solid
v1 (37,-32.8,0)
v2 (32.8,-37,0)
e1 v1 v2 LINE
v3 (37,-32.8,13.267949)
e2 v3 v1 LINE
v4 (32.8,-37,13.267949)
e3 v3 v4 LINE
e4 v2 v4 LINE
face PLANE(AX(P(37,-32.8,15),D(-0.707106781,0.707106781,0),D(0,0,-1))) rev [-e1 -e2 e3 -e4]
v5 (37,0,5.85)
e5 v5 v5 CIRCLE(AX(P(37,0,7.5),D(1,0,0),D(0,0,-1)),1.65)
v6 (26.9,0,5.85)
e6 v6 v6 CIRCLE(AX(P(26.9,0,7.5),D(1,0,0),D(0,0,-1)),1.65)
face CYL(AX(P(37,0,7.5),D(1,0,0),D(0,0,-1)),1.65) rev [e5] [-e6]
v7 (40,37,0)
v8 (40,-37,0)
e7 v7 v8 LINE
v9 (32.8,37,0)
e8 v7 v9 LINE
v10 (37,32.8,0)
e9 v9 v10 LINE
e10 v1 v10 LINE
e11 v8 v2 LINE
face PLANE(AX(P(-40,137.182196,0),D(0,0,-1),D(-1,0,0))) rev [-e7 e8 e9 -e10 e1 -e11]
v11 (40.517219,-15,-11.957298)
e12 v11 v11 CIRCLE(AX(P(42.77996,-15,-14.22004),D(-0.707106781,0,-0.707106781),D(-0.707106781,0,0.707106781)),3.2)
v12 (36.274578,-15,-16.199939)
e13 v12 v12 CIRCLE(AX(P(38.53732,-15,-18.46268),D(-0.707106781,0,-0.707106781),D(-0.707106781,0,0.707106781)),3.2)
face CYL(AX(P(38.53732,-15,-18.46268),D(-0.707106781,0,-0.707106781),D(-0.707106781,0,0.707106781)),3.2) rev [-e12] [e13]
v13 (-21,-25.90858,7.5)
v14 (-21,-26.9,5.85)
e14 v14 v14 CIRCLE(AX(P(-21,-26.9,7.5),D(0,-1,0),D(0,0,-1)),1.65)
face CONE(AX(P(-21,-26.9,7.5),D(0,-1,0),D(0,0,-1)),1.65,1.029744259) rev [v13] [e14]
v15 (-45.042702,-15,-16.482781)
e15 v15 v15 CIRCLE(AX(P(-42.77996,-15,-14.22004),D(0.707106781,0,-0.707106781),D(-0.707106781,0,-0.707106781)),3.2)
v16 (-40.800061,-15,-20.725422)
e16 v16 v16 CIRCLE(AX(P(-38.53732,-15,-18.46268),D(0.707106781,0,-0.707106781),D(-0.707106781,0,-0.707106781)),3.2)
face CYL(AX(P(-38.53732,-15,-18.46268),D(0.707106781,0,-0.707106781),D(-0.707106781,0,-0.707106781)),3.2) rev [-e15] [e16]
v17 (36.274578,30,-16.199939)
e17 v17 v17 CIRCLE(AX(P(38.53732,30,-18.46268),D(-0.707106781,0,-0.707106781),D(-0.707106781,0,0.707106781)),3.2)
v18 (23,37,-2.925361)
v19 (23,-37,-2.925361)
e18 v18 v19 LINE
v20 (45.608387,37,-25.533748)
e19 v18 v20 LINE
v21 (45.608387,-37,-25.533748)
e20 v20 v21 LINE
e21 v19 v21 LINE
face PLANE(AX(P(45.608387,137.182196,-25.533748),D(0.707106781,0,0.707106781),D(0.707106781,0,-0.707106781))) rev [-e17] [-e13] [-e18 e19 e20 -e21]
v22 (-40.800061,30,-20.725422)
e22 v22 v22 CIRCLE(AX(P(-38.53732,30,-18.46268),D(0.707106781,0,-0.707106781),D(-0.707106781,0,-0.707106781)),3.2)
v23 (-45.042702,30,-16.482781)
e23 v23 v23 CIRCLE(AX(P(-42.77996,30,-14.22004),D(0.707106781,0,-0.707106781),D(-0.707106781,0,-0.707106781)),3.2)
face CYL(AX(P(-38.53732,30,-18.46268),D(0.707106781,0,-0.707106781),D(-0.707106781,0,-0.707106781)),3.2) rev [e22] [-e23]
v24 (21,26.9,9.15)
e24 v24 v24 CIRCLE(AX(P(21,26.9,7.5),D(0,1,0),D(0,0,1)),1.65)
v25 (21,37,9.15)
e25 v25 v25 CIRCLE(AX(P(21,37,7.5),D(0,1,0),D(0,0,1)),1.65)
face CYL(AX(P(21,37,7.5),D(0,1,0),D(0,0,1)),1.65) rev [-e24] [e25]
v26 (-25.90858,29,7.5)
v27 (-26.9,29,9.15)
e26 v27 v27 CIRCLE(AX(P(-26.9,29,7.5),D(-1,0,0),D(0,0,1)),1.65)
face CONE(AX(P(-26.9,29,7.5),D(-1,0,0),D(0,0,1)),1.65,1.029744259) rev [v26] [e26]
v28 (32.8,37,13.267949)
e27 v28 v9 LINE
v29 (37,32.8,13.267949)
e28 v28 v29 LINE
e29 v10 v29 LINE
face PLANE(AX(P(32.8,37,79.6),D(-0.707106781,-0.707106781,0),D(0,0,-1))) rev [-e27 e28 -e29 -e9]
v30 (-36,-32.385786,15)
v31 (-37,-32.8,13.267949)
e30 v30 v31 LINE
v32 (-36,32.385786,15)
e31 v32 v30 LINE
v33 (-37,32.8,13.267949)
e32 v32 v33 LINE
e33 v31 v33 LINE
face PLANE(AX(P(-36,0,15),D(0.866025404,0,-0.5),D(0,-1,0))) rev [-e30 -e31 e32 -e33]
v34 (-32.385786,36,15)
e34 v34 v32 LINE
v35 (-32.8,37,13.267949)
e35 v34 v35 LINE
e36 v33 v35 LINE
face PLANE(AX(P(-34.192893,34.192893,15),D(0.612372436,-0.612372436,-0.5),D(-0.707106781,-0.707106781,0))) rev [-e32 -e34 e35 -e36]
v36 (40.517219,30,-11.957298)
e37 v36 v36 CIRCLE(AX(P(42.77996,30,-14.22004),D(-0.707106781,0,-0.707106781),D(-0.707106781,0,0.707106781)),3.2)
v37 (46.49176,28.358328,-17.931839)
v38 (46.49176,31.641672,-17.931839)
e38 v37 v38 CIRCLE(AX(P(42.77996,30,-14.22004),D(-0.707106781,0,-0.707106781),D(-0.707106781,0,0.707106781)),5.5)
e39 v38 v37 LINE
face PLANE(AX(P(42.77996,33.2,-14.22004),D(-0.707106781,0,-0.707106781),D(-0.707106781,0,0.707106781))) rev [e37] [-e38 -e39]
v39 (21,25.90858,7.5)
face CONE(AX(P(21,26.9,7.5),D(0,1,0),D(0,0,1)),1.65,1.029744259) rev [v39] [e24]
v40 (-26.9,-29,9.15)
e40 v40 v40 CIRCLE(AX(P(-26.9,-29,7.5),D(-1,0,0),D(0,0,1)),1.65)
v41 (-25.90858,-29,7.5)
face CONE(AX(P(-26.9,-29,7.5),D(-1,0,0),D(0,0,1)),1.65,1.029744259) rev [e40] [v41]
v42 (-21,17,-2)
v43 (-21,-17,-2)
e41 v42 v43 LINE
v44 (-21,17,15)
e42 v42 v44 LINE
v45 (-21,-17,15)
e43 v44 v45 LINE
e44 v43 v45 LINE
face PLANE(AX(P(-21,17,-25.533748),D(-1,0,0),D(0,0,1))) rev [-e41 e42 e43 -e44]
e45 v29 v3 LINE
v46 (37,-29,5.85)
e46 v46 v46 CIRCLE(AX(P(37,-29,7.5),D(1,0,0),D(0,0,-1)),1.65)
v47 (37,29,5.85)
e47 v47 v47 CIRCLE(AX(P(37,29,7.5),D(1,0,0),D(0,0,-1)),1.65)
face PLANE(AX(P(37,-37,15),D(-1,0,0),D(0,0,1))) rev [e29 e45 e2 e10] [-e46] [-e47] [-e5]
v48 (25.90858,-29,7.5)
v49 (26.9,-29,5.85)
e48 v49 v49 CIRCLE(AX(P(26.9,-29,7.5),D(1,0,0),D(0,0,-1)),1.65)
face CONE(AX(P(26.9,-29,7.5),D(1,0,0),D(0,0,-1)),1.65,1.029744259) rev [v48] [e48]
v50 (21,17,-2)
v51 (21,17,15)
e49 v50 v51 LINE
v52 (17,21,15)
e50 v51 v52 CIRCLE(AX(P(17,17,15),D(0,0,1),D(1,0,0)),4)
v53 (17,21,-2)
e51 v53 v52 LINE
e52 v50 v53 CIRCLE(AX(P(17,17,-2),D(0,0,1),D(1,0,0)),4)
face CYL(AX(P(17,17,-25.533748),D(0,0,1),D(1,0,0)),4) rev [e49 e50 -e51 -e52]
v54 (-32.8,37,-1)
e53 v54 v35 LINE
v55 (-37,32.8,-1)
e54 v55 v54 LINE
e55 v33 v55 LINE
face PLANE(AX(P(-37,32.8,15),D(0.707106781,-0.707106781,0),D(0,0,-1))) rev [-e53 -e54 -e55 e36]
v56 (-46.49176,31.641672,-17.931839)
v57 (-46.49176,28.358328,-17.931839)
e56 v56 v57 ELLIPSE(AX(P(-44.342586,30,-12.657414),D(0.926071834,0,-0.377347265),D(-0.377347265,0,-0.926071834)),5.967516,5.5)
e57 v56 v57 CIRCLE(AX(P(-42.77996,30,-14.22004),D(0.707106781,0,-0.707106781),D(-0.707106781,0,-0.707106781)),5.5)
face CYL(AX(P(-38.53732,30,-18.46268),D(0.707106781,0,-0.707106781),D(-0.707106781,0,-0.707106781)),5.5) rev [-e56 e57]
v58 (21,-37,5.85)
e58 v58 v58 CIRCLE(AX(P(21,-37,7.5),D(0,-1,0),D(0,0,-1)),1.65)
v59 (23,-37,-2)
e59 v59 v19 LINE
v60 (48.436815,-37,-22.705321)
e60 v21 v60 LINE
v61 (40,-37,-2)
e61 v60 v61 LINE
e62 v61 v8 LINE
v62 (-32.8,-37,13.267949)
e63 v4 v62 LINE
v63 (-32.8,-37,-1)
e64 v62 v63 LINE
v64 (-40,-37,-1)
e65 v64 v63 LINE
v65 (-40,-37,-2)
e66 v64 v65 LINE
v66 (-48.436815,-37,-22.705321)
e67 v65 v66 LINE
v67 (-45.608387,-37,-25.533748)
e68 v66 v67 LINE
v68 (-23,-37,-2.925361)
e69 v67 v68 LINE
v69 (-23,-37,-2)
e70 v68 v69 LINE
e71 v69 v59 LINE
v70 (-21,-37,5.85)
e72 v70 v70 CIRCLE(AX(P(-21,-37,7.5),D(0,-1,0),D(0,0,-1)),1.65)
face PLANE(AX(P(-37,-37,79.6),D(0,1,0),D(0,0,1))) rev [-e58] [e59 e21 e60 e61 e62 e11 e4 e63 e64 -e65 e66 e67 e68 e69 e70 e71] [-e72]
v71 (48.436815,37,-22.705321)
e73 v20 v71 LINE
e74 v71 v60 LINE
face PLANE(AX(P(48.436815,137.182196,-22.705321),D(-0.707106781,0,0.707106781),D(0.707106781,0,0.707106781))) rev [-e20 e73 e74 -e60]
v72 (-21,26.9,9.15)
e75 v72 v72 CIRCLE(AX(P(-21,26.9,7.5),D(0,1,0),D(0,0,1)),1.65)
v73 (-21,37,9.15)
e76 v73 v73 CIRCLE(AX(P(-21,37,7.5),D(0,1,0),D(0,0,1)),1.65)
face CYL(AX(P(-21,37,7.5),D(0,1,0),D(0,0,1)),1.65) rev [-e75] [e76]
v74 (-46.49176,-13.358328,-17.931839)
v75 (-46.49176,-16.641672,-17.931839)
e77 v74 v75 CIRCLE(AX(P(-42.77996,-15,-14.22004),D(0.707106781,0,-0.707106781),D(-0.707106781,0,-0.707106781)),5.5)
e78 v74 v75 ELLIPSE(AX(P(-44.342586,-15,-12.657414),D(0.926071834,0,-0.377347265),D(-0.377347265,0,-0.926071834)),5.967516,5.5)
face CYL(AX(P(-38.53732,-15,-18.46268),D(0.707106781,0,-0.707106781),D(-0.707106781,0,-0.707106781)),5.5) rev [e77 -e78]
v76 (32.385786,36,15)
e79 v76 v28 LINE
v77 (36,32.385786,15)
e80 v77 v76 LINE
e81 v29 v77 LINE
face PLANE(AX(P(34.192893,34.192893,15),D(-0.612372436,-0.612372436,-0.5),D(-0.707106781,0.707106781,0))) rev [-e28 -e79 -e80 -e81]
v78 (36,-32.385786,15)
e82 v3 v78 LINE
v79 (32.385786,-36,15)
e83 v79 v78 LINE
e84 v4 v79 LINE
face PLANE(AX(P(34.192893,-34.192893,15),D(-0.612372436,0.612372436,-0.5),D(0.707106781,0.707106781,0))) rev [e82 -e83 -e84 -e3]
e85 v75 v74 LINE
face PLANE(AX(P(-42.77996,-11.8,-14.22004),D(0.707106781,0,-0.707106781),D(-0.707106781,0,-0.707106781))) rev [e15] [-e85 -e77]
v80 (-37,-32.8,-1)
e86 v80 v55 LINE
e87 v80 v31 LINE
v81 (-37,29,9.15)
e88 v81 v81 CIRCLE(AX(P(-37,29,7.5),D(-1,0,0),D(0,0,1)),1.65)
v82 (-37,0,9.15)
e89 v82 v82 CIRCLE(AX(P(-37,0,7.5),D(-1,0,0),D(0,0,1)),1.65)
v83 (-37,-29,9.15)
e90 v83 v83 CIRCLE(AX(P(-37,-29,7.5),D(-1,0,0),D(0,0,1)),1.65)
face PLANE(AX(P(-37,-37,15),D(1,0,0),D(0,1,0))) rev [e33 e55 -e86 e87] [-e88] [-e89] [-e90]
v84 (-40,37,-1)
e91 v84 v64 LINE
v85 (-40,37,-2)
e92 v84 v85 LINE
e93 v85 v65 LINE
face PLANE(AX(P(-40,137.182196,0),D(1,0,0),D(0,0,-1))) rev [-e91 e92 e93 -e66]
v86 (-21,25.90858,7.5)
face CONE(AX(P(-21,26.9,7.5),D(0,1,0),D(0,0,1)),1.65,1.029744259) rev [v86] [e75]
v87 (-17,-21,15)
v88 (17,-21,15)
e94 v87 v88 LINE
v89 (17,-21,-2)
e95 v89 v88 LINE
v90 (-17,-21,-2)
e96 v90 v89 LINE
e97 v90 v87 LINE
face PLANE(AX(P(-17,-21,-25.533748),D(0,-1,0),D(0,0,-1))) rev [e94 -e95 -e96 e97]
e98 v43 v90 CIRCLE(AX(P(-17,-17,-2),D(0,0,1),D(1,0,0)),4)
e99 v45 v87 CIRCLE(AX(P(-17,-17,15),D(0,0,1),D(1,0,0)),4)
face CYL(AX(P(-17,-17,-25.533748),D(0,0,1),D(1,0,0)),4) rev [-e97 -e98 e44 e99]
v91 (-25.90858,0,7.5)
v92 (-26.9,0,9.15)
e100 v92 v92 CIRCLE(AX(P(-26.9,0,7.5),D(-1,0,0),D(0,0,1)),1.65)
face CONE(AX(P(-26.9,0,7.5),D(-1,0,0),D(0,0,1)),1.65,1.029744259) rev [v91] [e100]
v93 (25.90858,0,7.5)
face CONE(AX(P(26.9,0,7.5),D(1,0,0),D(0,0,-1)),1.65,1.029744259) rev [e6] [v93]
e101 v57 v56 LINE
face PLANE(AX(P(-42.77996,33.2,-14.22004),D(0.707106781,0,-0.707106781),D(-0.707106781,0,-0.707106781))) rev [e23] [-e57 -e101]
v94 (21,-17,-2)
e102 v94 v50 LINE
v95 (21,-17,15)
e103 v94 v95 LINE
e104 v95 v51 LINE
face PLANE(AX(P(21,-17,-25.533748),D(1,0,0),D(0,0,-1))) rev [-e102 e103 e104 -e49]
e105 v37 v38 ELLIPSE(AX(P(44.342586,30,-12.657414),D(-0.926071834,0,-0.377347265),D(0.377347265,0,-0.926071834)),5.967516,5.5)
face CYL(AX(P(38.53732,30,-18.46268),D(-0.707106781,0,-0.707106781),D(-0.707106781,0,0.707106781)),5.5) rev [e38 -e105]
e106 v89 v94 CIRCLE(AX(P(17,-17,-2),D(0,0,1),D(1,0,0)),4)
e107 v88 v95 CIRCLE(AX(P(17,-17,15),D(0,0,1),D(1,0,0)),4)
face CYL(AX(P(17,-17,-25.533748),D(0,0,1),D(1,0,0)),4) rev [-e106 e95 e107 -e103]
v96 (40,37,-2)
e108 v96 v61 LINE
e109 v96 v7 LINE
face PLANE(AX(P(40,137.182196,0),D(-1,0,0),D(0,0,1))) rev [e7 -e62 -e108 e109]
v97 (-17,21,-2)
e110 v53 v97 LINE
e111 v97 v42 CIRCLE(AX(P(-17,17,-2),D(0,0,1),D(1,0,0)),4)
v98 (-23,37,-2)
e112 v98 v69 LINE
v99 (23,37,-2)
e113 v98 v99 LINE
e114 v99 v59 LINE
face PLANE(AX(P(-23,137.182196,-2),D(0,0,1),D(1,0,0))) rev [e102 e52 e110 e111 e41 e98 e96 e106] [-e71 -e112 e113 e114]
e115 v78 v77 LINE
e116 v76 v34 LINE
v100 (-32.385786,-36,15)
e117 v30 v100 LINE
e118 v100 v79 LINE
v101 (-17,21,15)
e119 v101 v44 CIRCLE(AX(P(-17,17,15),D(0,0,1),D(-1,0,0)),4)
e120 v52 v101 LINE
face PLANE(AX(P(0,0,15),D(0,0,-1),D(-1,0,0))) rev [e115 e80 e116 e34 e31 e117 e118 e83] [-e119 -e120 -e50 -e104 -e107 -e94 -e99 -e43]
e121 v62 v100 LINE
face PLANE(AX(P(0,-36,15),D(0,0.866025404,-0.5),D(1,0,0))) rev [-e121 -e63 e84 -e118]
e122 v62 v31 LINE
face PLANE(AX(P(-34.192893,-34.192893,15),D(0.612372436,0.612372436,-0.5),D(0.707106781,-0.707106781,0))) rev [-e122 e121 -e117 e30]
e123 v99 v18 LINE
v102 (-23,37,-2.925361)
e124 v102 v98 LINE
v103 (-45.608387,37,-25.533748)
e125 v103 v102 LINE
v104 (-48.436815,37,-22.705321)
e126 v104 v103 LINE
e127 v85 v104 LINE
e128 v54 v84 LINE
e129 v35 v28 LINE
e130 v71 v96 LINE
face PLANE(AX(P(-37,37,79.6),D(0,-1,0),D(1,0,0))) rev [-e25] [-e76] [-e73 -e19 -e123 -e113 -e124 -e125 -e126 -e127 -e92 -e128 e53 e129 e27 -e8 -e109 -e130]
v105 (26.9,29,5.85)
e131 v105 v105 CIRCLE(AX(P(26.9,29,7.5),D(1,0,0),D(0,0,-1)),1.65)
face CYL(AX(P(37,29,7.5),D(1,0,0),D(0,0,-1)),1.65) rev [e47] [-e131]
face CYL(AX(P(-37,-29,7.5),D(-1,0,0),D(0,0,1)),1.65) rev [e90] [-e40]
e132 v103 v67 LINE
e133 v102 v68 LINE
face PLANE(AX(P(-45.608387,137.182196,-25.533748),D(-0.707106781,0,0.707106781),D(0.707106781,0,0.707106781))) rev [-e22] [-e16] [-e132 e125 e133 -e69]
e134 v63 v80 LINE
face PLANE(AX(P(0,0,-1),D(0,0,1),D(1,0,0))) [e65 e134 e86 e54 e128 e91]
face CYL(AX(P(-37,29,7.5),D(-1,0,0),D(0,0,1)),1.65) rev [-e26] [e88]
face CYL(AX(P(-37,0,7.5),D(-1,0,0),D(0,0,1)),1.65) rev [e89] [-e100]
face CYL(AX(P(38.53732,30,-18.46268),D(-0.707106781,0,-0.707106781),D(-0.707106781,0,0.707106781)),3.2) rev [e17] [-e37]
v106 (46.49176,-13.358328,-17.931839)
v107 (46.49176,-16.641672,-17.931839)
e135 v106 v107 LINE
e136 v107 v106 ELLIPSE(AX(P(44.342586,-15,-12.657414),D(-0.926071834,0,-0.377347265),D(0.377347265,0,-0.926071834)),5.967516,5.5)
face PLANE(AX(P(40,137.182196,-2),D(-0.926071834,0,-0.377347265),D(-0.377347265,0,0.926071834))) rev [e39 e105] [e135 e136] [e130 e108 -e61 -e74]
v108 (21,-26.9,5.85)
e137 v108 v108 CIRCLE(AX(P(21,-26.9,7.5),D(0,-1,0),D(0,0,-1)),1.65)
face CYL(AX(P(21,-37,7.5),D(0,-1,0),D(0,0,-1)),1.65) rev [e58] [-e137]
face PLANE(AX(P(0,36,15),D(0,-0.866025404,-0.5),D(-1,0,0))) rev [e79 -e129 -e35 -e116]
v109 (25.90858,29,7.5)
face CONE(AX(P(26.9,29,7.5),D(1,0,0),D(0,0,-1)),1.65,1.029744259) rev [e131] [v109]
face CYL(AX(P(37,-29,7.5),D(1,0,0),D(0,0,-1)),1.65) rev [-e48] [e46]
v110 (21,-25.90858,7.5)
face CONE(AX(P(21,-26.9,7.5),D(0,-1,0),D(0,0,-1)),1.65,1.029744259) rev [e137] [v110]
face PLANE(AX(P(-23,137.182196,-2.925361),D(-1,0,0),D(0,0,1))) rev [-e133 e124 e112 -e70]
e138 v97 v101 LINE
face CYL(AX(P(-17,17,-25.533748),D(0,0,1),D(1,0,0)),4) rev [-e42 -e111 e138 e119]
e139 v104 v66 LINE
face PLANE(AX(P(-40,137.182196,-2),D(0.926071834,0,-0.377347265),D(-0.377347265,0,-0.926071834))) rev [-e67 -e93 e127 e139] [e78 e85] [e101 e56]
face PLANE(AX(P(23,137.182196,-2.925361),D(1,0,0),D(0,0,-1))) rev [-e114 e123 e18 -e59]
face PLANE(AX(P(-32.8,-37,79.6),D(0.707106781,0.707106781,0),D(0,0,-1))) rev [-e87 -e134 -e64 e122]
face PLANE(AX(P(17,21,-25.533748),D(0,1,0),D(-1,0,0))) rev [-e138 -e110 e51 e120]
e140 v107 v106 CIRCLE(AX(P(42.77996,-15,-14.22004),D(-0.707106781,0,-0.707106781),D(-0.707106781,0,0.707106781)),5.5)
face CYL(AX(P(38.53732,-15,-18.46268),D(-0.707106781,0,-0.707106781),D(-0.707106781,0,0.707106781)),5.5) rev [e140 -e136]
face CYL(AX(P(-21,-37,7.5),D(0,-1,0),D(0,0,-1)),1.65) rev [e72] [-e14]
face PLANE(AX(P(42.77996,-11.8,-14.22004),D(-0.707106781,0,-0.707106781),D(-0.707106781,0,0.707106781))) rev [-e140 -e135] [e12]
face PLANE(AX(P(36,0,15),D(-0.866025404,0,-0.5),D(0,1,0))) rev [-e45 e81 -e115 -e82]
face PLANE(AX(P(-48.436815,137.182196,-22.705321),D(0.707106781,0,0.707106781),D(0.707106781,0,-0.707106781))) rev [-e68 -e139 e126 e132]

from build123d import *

# Parameters (mm, degrees)
BOSS_EXTRUDE1_DEPTH             = 37
BOSS_EXTRUDE1_DEPTH_BACK        = 37
SKETCH2_W                       = 74
SKETCH2_H                       = 74
BOSS_EXTRUDE2_DEPTH             = 15
ADVANCEDHOLE1_START             = 20.194913472
ADVANCEDHOLE1_DEPTH             = 4.525323154
ADVANCEDHOLE1_START_2           = 14.194913472
ADVANCEDHOLE1_2_OUTLINE_R       = 3.2
ADVANCEDHOLE1_2_DEPTH           = 6
ADVANCEDHOLE2_START             = -24.720236626
ADVANCEDHOLE2_DEPTH             = 4.525323154
ADVANCEDHOLE2_START_2           = -20.194913472
ADVANCEDHOLE2_2_OUTLINE_R       = 3.2
ADVANCEDHOLE2_2_DEPTH           = 6
SKETCH11_W                      = 3
SKETCH11_H                      = 74
CUT_EXTRUDE1_DEPTH              = 1
M4_TAPPED_HOLE1_D               = 3.3
M4_TAPPED_HOLE1_DEPTH           = 10.1
M4_TAPPED_HOLE1_TIP             = 0.991420021
M4_TAPPED_HOLE1_ON_FACE_2_D     = 3.3
M4_TAPPED_HOLE1_ON_FACE_2_DEPTH = 10.1
M4_TAPPED_HOLE1_ON_FACE_2_TIP   = 0.991420021
M4_TAPPED_HOLE1_ON_FACE_3_D     = 3.3
M4_TAPPED_HOLE1_ON_FACE_3_DEPTH = 10.1
M4_TAPPED_HOLE1_ON_FACE_3_TIP   = 0.991420021
M4_TAPPED_HOLE1_ON_FACE_4_D     = 3.3
M4_TAPPED_HOLE1_ON_FACE_4_DEPTH = 10.1
M4_TAPPED_HOLE1_ON_FACE_4_TIP   = 0.991420021
CHAMFER1_SIZE                   = 4.2
CHAMFER2_SIZE                   = 1
CHAMFER2_SIZE2                  = 1.732050808
CUT_EXTRUDE2_DEPTH              = 74.199110283


# Read off the part's stored shape, not the designer's step: AdvancedHole1, AdvancedHole2
with BuildPart() as part:
    # Sketch1 → Boss-Extrude1 (new, two sides: drawn at the far end of the back side and taken through both)
    with BuildSketch(Plane(origin=(0, 0, 0), x_dir=(1, 0, 0), z_dir=(0, 1, 0)).offset(-BOSS_EXTRUDE1_DEPTH_BACK)):
        Polygon((-40, 2), (-48.436814511, 22.705321112), (-45.608387387, 25.533748237), (-23, 2.925360851), (-23, 2), (23, 2), (23, 2.925360851), (45.608387387, 25.533748237), (48.436814511, 22.705321112), (40, 2), (40, 0), (-40, 0), align=None)
    extrude(amount=BOSS_EXTRUDE1_DEPTH + BOSS_EXTRUDE1_DEPTH_BACK)

    # Sketch2 → Boss-Extrude2 (add)
    with BuildSketch(Plane.XY):
        Rectangle(SKETCH2_W, SKETCH2_H)
    extrude(amount=BOSS_EXTRUDE2_DEPTH)

    # AdvancedHole1 outline → AdvancedHole1 (cut)
    with BuildSketch(Plane(origin=(0, 0, 0), x_dir=(0.707106781186546, 0, -0.707106781186549), z_dir=(0.707106781186549, 0, 0.707106781186546)).offset(ADVANCEDHOLE1_START)):
        with BuildLine():
            Line((45.554363955, 28.35832814), (46.067784427, 30))
            Line((46.067784427, 30), (45.554363955, 31.64167186))
            ThreePointArc((45.554363955, 31.64167186), (34.805086528, 30), (45.554363955, 28.35832814))
        make_face()
        with BuildLine():
            ThreePointArc((45.554363955, -13.35832814), (34.805086528, -15), (45.554363955, -16.64167186))
            Line((45.554363955, -16.64167186), (46.067784427, -15))
            Line((46.067784427, -15), (45.554363955, -13.35832814))
        make_face()
    extrude(amount=ADVANCEDHOLE1_DEPTH, mode=Mode.SUBTRACT)

    # AdvancedHole1 2 outline → AdvancedHole1 2 (cut)
    with BuildSketch(Plane(origin=(0, 0, 0), x_dir=(0.707106781186546, 0, -0.707106781186549), z_dir=(0.707106781186549, 0, 0.707106781186546)).offset(ADVANCEDHOLE1_START_2)):
        with Locations((40.305086528, -15)):
            Circle(ADVANCEDHOLE1_2_OUTLINE_R)
        with Locations((40.305086528, 30)):
            Circle(ADVANCEDHOLE1_2_OUTLINE_R)
    extrude(amount=ADVANCEDHOLE1_2_DEPTH, mode=Mode.SUBTRACT)

    # AdvancedHole2 outline → AdvancedHole2 (cut)
    with BuildSketch(Plane(origin=(0, 0, 0), x_dir=(0.707106781186546, 0, 0.707106781186549), z_dir=(0.707106781186549, 0, -0.707106781186546)).offset(ADVANCEDHOLE2_START)):
        with BuildLine():
            Line((-46.067784427, 15), (-45.554363955, 13.35832814))
            ThreePointArc((-45.554363955, 13.35832814), (-34.805086528, 15), (-45.554363955, 16.64167186))
            Line((-45.554363955, 16.64167186), (-46.067784427, 15))
        make_face()
        with BuildLine():
            Line((-45.554363955, -28.35832814), (-46.067784427, -30))
            Line((-46.067784427, -30), (-45.554363955, -31.64167186))
            ThreePointArc((-45.554363955, -31.64167186), (-34.805086528, -30), (-45.554363955, -28.35832814))
        make_face()
    extrude(amount=ADVANCEDHOLE2_DEPTH, mode=Mode.SUBTRACT)

    # AdvancedHole2 2 outline → AdvancedHole2 2 (cut)
    with BuildSketch(Plane(origin=(0, 0, 0), x_dir=(0.707106781186546, 0, 0.707106781186549), z_dir=(0.707106781186549, 0, -0.707106781186546)).offset(ADVANCEDHOLE2_START_2)):
        with Locations((-40.305086528, 15)):
            Circle(ADVANCEDHOLE2_2_OUTLINE_R)
        with Locations((-40.305086528, -30)):
            Circle(ADVANCEDHOLE2_2_OUTLINE_R)
    extrude(amount=ADVANCEDHOLE2_2_DEPTH, mode=Mode.SUBTRACT)

    # Sketch11 → Cut-Extrude1 (cut)
    with BuildSketch(Plane.XY):
        with Locations((-38.5, 0)):
            Rectangle(SKETCH11_W, SKETCH11_H)
    extrude(amount=-CUT_EXTRUDE1_DEPTH, mode=Mode.SUBTRACT)

    # M4 Tapped Hole1
    with Locations(Plane(origin=(37, 29, 7.5), x_dir=(0, 0, 1), z_dir=(1, 0, 0))):
        with Locations((0, 0), (0, 58), (0, 29)):
            Hole(M4_TAPPED_HOLE1_D / 2, depth=M4_TAPPED_HOLE1_DEPTH)
            with Locations((0, 0, -(M4_TAPPED_HOLE1_DEPTH + M4_TAPPED_HOLE1_TIP / 2))):  # 118° drill point
                Cone(0, M4_TAPPED_HOLE1_D / 2, M4_TAPPED_HOLE1_TIP, mode=Mode.SUBTRACT)

    # M4 Tapped Hole1 on face 2
    with Locations(Plane(origin=(-37, 29, 7.5), x_dir=(0, 0, -1), z_dir=(-1, 0, 0))):
        with Locations((0, 0), (0, 58), (0, 29)):
            Hole(M4_TAPPED_HOLE1_ON_FACE_2_D / 2, depth=M4_TAPPED_HOLE1_ON_FACE_2_DEPTH)
            with Locations((0, 0, -(M4_TAPPED_HOLE1_ON_FACE_2_DEPTH + M4_TAPPED_HOLE1_ON_FACE_2_TIP / 2))):  # 118° drill point
                Cone(0, M4_TAPPED_HOLE1_ON_FACE_2_D / 2, M4_TAPPED_HOLE1_ON_FACE_2_TIP, mode=Mode.SUBTRACT)

    # M4 Tapped Hole1 on face 3
    with Locations(Plane(origin=(21, 37, 7.5), x_dir=(0, 0, 1), z_dir=(0, 1, 0))):
        with Locations((0, 0), (0, -42)):
            Hole(M4_TAPPED_HOLE1_ON_FACE_3_D / 2, depth=M4_TAPPED_HOLE1_ON_FACE_3_DEPTH)
            with Locations((0, 0, -(M4_TAPPED_HOLE1_ON_FACE_3_DEPTH + M4_TAPPED_HOLE1_ON_FACE_3_TIP / 2))):  # 118° drill point
                Cone(0, M4_TAPPED_HOLE1_ON_FACE_3_D / 2, M4_TAPPED_HOLE1_ON_FACE_3_TIP, mode=Mode.SUBTRACT)

    # M4 Tapped Hole1 on face 4
    with Locations(Plane(origin=(-21, -37, 7.5), x_dir=(0, 0, -1), z_dir=(0, -1, 0))):
        with Locations((0, 0), (0, 42)):
            Hole(M4_TAPPED_HOLE1_ON_FACE_4_D / 2, depth=M4_TAPPED_HOLE1_ON_FACE_4_DEPTH)
            with Locations((0, 0, -(M4_TAPPED_HOLE1_ON_FACE_4_DEPTH + M4_TAPPED_HOLE1_ON_FACE_4_TIP / 2))):  # 118° drill point
                Cone(0, M4_TAPPED_HOLE1_ON_FACE_4_D / 2, M4_TAPPED_HOLE1_ON_FACE_4_TIP, mode=Mode.SUBTRACT)

    # Chamfer1
    chamfer1_edges = [part.edges().sort_by_distance(p)[0] for p in [
        (37, -37, 7.5),
        (37, 37, 7.5),
        (-37, 37, 7),
        (-37, -37, 7),
    ]]
    chamfer(chamfer1_edges, length=CHAMFER1_SIZE)

    # Chamfer2
    chamfer2_edges = [part.edges().sort_by_distance(p)[0] for p in [
        (37, 0, 15),
        (0, -37, 15),
        (0, 37, 15),
        (-37, 0, 15),
        (34.9, 34.9, 15),
        (-34.9, 34.9, 15),
        (-34.9, -34.9, 15),
        (34.9, -34.9, 15),
    ]]
    chamfer2_side = [part.faces().sort_by_distance(p)[0] for p in [
        (0, 0, 15),
    ]]
    chamfer(chamfer2_edges, length=CHAMFER2_SIZE, length2=CHAMFER2_SIZE2, reference=chamfer2_side[0])

    # Sketch13 → Cut-Extrude2 (cut, through all)
    with BuildSketch(Plane.XY.offset(15)):
        with BuildLine():
            Line((-21, 17), (-21, -17))
            ThreePointArc((-21, -17), (-19.828427125, -19.828427125), (-17, -21))
            Line((-17, -21), (17, -21))
            ThreePointArc((17, -21), (19.828427125, -19.828427125), (21, -17))
            Line((21, -17), (21, 17))
            ThreePointArc((21, 17), (19.828427125, 19.828427125), (17, 21))
            Line((17, 21), (-17, 21))
            ThreePointArc((-17, 21), (-19.828427125, 19.828427125), (-21, 17))
        make_face()
    extrude(amount=-CUT_EXTRUDE2_DEPTH, mode=Mode.SUBTRACT)


solid = part.part
